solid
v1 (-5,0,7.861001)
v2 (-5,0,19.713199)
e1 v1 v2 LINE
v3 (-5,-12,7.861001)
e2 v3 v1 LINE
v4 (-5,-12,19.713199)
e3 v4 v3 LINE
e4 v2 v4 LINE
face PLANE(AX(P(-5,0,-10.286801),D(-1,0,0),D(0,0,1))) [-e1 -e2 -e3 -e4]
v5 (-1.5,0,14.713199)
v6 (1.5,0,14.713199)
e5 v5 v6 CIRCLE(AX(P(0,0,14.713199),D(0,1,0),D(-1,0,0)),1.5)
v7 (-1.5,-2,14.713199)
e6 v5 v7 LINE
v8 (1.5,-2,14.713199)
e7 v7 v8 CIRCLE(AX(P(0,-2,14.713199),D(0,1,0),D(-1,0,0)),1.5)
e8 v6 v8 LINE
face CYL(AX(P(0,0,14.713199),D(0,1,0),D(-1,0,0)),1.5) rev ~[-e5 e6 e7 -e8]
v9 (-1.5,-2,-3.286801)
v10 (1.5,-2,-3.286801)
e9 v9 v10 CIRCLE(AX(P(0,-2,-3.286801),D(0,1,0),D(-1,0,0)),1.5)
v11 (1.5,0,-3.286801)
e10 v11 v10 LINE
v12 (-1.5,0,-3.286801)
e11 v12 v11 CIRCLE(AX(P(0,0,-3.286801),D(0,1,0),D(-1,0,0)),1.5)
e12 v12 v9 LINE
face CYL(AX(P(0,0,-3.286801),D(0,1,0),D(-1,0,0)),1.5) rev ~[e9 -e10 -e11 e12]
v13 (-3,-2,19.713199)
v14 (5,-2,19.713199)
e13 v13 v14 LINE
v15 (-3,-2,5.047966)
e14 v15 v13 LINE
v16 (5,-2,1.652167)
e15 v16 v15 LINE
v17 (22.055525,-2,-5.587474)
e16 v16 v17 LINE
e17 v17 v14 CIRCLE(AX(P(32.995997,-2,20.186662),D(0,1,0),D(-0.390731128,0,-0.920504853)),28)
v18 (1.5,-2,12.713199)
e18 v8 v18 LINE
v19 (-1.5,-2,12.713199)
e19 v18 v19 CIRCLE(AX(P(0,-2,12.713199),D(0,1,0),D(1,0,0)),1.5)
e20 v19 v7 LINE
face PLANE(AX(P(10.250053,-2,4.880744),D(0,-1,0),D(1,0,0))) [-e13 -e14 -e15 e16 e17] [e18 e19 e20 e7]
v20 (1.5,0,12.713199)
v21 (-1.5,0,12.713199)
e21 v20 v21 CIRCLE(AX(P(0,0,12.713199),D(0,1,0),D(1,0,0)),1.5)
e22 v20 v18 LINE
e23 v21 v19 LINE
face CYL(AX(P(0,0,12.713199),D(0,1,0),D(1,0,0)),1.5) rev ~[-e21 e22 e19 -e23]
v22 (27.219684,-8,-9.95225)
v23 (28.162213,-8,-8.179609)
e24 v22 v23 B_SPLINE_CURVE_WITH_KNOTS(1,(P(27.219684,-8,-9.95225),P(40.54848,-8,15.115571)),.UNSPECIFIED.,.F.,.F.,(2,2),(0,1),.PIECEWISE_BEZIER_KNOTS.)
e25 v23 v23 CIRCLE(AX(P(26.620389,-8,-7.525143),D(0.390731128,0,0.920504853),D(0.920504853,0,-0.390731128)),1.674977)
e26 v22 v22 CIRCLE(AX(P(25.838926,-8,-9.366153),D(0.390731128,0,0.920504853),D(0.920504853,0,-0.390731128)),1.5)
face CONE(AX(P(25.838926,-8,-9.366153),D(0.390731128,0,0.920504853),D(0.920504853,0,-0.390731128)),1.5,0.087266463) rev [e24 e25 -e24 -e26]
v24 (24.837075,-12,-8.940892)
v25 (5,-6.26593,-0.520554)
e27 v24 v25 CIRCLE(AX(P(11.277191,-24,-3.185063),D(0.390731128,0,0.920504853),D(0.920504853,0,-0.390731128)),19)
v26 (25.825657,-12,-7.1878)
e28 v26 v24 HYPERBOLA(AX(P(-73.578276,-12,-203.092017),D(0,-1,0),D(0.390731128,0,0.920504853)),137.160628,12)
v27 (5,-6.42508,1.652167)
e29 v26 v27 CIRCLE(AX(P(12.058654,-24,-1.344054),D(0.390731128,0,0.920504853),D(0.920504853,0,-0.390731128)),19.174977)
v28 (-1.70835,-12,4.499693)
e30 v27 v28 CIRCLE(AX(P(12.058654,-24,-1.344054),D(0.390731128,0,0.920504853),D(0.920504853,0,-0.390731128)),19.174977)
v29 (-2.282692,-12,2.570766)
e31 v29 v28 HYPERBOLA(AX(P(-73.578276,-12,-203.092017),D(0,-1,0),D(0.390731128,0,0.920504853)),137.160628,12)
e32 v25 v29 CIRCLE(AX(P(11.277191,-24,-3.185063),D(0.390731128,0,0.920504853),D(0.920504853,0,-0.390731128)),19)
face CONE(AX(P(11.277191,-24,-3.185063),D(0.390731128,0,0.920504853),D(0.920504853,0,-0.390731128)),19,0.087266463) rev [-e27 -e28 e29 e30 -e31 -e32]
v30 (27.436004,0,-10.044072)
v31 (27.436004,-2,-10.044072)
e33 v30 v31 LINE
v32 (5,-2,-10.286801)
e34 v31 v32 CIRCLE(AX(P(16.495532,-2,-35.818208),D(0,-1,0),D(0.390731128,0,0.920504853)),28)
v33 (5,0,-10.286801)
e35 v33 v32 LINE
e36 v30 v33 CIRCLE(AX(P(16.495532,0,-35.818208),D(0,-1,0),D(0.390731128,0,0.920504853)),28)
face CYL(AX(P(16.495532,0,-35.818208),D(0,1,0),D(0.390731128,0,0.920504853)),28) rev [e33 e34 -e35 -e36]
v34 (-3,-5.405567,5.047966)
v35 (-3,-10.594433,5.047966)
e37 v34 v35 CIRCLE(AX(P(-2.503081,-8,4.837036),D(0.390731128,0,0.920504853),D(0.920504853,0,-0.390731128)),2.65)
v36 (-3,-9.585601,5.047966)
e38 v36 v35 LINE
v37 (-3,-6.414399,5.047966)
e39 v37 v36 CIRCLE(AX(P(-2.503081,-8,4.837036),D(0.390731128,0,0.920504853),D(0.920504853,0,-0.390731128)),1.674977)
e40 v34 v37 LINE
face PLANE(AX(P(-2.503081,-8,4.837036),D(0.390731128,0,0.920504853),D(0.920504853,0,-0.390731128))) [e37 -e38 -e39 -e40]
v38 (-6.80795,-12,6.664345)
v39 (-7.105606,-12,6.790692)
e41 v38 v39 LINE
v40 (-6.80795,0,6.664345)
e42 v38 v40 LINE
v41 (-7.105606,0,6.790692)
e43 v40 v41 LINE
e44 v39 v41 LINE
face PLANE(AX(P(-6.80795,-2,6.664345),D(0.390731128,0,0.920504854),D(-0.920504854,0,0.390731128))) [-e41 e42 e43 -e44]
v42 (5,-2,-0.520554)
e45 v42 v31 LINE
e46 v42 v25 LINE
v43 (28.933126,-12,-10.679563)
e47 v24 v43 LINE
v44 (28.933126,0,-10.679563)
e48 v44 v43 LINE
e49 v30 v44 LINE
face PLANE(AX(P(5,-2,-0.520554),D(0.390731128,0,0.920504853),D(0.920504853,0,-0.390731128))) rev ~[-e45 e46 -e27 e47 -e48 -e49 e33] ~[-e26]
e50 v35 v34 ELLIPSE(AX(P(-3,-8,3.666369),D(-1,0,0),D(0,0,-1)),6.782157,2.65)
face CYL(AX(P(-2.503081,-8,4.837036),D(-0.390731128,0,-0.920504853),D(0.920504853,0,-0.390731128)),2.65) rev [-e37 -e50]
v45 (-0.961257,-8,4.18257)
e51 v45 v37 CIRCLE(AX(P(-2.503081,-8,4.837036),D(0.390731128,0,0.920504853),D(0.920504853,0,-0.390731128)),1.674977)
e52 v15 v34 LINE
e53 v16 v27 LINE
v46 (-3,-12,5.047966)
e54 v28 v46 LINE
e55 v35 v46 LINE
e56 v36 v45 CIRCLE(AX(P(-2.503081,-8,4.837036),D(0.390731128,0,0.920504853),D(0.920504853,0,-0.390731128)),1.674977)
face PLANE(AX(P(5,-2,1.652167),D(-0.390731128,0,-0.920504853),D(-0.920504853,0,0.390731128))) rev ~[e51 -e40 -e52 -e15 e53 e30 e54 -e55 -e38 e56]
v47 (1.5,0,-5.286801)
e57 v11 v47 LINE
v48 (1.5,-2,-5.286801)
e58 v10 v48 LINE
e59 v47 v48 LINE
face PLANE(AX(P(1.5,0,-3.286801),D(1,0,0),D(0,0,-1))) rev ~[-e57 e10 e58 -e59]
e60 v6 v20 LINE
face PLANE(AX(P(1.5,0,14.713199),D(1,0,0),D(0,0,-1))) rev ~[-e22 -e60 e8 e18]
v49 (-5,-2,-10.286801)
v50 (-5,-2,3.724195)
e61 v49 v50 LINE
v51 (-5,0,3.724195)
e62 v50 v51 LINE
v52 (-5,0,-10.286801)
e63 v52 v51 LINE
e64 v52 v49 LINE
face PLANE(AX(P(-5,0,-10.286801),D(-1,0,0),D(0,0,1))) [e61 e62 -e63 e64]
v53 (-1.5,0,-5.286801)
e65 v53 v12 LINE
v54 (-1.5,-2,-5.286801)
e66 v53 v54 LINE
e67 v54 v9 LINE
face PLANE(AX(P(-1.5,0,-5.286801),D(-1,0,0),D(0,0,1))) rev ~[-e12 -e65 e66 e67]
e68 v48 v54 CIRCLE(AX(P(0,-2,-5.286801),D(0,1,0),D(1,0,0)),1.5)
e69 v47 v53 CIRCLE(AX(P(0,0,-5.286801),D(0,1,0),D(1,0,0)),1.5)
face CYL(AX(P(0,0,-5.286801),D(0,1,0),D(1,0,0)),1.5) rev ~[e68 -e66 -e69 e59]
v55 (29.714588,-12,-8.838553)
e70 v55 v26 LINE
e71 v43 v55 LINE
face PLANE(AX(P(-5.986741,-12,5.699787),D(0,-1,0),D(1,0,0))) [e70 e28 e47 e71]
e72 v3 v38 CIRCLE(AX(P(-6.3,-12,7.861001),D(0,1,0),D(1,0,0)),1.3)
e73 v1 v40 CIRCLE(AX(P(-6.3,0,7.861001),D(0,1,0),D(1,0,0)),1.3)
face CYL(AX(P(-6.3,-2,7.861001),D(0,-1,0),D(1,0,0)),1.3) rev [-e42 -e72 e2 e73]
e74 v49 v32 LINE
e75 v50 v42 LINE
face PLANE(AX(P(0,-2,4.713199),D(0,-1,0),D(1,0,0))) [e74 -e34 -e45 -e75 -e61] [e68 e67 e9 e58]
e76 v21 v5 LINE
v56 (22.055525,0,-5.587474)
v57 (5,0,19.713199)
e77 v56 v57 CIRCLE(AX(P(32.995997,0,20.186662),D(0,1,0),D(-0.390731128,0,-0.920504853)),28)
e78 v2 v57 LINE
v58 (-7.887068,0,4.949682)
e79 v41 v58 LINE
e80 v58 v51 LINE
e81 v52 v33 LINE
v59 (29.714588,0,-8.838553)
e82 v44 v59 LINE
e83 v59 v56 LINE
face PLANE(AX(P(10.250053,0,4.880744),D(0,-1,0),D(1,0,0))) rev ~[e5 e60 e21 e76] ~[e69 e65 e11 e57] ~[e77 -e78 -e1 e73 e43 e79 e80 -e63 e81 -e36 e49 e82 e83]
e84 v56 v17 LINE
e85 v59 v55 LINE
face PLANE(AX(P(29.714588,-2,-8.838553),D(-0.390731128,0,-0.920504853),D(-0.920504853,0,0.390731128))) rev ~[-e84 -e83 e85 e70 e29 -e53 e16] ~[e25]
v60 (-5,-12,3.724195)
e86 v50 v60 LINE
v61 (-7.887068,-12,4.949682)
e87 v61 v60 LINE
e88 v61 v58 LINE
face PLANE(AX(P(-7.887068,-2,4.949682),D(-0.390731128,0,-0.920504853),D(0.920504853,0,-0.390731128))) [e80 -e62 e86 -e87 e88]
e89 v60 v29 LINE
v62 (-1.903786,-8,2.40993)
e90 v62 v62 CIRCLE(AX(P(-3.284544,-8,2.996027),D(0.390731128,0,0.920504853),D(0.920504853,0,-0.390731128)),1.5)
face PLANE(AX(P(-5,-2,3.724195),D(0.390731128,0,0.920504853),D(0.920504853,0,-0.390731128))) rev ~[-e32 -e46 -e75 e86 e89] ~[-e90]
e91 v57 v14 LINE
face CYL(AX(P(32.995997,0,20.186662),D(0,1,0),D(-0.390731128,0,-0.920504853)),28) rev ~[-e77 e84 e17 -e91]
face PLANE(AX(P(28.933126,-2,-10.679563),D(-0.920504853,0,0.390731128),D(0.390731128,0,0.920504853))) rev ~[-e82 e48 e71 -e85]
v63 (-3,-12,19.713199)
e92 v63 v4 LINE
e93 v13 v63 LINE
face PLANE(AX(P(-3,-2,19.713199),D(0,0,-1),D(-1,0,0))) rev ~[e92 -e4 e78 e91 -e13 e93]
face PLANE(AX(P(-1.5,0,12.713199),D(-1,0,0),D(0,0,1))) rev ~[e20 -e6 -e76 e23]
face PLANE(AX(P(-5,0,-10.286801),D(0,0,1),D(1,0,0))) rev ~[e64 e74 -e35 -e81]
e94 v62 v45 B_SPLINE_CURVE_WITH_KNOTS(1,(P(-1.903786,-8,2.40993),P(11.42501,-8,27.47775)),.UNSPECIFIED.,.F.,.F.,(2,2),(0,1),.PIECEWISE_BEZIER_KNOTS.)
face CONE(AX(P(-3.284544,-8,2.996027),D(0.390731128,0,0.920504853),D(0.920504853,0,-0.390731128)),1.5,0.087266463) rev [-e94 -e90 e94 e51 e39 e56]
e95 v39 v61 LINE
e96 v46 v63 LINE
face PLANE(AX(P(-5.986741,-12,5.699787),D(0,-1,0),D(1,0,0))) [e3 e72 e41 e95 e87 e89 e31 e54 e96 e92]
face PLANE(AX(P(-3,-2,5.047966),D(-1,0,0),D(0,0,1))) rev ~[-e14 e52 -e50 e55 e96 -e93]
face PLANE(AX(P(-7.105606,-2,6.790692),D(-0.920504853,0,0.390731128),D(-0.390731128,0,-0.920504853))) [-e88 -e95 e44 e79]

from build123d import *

# Parameters (mm, degrees)
F0_W          = 10
F0_H          = 30
F1_DEPTH      = 2
F3_DEPTH      = 10
F3_DEPTH_BACK = 2
F4_R          = 1.5
F4_R_2        = 19
F5_DEPTH      = 28.2830263058
F5_TAPER      = -5
F6_R          = 2.65
F7_DEPTH      = 55
F8_T1_DEPTH   = 2


# Not quite as in the source:
# - a fillet or chamfer that OpenCascade refuses, or shapes differently, is made with other operations: its cross-section is extruded or revolved along the edge and cut away or added
# - an extrude ends at something that could not be found from the text; its depth is read off the source's solid
# - a feature names something its author has since deleted; it is built from what else it names


with BuildPart() as f1:
    # F0 (on Front) → F1 (new body)
    with BuildSketch(Plane.XZ):
        with Locations((0, 4.7131987304)):
            Rectangle(F0_W, F0_H)
        with BuildLine():
            ThreePointArc((-1.5, -3.2868012696), (0, -1.7868012696), (1.5, -3.2868012696))
            Line((1.5, -3.2868012696), (1.5, -5.2868012696))
            ThreePointArc((1.5, -5.2868012696), (0, -6.7868012696), (-1.5, -5.2868012696))
            Line((-1.5, -5.2868012696), (-1.5, -3.2868012696))
        make_face(mode=Mode.SUBTRACT)
        with BuildLine():
            ThreePointArc((-1.5, 14.7131987304), (0, 16.2131987304), (1.5, 14.7131987304))
            Line((1.5, 14.7131987304), (1.5, 12.7131987304))
            ThreePointArc((1.5, 12.7131987304), (0, 11.2131987304), (-1.5, 12.7131987304))
            Line((-1.5, 12.7131987304), (-1.5, 14.7131987304))
        make_face(mode=Mode.SUBTRACT)
    extrude(amount=F1_DEPTH)

    # F2 (on face) → F3 (join, two sides)
    with BuildSketch(Plane.XZ.offset(2)) as f3_sk:
        with BuildLine():
            Line((-7.8870679483, 4.9496821465), (-5, 3.7241945098))
            Line((-5, 3.7241945098), (-5, 7.8610010163))
            ThreePointArc((-5, 7.8610010163), (-5.5824819191, 6.7769494476), (-6.807950467, 6.6643447068))
            Line((-6.807950467, 6.6643447068), (-7.1056056914, 6.7906918534))
            Line((-7.1056056914, 6.7906918534), (-7.8870679483, 4.9496821465))
        make_face()
        Polygon((5, -0.5205536523), (28.9331261898, -10.679562993), (29.7145884467, -8.8385532861), (5, 1.6521671025), align=None)
        Polygon((-5, 3.7241945098), (5, -0.5205536523), (5, 1.6521671025), (-3, 5.0479656322), (-3, 19.7131987304), (-5, 19.7131987304), (-5, 7.8610010163), align=None)
    extrude(amount=F3_DEPTH)
    extrude(f3_sk.sketch, amount=-F3_DEPTH_BACK)

    # F4 (on face) → F5 (cut, through all)
    with BuildSketch(Plane(origin=(0.5761265937, 0, 1.3572691988), x_dir=(0.9205048535, 0, -0.3907311285), z_dir=(-0.3907311285, 0, -0.9205048535))):
        with Locations((-4.1940792167, 8)):
            Circle(F4_R)
        with Locations((27.4445048224, 8)):
            Circle(F4_R)
        with Locations((11.6252128028, 24)):
            Circle(F4_R_2)
    extrude(amount=-F5_DEPTH, taper=F5_TAPER, mode=Mode.SUBTRACT)

    # F6 (on face) → F7 (cut, through all)
    with BuildSketch(Plane(origin=(1.3575888507, 0, 3.1982789057), x_dir=(0.9205048535, 0, -0.3907311285), z_dir=(0.3907311285, 0, 0.9205048535))):
        with Locations((27.4445048224, -8)):
            Circle(F6_R)
        with Locations((-4.1940792167, -8)):
            Circle(F6_R)
    extrude(amount=F7_DEPTH, mode=Mode.SUBTRACT)

    # F8: fillet of radius 28 on 2 edges, made by hand

    # F8_s2 → F8_t1 (join)
    with BuildSketch(Plane.XZ):
        with BuildLine():
            ThreePointArc((22.0555251238, -5.5874737898), (9.7786939327, 4.5355646625), (5, 19.7131987304))
            Line((5, 19.7131987304), (5, 1.6521671025))
            Line((5, 1.6521671025), (22.0555251238, -5.5874737898))
        make_face()
        with BuildLine():
            ThreePointArc((27.43600386, -10.0440722673), (16.1926256307, -7.8198466481), (5, -10.2868012696))
            Line((5, -10.2868012696), (5, -0.5205536523))
            Line((5, -0.5205536523), (27.43600386, -10.0440722673))
        make_face()
    extrude(amount=F8_T1_DEPTH)


solid = f1.part
